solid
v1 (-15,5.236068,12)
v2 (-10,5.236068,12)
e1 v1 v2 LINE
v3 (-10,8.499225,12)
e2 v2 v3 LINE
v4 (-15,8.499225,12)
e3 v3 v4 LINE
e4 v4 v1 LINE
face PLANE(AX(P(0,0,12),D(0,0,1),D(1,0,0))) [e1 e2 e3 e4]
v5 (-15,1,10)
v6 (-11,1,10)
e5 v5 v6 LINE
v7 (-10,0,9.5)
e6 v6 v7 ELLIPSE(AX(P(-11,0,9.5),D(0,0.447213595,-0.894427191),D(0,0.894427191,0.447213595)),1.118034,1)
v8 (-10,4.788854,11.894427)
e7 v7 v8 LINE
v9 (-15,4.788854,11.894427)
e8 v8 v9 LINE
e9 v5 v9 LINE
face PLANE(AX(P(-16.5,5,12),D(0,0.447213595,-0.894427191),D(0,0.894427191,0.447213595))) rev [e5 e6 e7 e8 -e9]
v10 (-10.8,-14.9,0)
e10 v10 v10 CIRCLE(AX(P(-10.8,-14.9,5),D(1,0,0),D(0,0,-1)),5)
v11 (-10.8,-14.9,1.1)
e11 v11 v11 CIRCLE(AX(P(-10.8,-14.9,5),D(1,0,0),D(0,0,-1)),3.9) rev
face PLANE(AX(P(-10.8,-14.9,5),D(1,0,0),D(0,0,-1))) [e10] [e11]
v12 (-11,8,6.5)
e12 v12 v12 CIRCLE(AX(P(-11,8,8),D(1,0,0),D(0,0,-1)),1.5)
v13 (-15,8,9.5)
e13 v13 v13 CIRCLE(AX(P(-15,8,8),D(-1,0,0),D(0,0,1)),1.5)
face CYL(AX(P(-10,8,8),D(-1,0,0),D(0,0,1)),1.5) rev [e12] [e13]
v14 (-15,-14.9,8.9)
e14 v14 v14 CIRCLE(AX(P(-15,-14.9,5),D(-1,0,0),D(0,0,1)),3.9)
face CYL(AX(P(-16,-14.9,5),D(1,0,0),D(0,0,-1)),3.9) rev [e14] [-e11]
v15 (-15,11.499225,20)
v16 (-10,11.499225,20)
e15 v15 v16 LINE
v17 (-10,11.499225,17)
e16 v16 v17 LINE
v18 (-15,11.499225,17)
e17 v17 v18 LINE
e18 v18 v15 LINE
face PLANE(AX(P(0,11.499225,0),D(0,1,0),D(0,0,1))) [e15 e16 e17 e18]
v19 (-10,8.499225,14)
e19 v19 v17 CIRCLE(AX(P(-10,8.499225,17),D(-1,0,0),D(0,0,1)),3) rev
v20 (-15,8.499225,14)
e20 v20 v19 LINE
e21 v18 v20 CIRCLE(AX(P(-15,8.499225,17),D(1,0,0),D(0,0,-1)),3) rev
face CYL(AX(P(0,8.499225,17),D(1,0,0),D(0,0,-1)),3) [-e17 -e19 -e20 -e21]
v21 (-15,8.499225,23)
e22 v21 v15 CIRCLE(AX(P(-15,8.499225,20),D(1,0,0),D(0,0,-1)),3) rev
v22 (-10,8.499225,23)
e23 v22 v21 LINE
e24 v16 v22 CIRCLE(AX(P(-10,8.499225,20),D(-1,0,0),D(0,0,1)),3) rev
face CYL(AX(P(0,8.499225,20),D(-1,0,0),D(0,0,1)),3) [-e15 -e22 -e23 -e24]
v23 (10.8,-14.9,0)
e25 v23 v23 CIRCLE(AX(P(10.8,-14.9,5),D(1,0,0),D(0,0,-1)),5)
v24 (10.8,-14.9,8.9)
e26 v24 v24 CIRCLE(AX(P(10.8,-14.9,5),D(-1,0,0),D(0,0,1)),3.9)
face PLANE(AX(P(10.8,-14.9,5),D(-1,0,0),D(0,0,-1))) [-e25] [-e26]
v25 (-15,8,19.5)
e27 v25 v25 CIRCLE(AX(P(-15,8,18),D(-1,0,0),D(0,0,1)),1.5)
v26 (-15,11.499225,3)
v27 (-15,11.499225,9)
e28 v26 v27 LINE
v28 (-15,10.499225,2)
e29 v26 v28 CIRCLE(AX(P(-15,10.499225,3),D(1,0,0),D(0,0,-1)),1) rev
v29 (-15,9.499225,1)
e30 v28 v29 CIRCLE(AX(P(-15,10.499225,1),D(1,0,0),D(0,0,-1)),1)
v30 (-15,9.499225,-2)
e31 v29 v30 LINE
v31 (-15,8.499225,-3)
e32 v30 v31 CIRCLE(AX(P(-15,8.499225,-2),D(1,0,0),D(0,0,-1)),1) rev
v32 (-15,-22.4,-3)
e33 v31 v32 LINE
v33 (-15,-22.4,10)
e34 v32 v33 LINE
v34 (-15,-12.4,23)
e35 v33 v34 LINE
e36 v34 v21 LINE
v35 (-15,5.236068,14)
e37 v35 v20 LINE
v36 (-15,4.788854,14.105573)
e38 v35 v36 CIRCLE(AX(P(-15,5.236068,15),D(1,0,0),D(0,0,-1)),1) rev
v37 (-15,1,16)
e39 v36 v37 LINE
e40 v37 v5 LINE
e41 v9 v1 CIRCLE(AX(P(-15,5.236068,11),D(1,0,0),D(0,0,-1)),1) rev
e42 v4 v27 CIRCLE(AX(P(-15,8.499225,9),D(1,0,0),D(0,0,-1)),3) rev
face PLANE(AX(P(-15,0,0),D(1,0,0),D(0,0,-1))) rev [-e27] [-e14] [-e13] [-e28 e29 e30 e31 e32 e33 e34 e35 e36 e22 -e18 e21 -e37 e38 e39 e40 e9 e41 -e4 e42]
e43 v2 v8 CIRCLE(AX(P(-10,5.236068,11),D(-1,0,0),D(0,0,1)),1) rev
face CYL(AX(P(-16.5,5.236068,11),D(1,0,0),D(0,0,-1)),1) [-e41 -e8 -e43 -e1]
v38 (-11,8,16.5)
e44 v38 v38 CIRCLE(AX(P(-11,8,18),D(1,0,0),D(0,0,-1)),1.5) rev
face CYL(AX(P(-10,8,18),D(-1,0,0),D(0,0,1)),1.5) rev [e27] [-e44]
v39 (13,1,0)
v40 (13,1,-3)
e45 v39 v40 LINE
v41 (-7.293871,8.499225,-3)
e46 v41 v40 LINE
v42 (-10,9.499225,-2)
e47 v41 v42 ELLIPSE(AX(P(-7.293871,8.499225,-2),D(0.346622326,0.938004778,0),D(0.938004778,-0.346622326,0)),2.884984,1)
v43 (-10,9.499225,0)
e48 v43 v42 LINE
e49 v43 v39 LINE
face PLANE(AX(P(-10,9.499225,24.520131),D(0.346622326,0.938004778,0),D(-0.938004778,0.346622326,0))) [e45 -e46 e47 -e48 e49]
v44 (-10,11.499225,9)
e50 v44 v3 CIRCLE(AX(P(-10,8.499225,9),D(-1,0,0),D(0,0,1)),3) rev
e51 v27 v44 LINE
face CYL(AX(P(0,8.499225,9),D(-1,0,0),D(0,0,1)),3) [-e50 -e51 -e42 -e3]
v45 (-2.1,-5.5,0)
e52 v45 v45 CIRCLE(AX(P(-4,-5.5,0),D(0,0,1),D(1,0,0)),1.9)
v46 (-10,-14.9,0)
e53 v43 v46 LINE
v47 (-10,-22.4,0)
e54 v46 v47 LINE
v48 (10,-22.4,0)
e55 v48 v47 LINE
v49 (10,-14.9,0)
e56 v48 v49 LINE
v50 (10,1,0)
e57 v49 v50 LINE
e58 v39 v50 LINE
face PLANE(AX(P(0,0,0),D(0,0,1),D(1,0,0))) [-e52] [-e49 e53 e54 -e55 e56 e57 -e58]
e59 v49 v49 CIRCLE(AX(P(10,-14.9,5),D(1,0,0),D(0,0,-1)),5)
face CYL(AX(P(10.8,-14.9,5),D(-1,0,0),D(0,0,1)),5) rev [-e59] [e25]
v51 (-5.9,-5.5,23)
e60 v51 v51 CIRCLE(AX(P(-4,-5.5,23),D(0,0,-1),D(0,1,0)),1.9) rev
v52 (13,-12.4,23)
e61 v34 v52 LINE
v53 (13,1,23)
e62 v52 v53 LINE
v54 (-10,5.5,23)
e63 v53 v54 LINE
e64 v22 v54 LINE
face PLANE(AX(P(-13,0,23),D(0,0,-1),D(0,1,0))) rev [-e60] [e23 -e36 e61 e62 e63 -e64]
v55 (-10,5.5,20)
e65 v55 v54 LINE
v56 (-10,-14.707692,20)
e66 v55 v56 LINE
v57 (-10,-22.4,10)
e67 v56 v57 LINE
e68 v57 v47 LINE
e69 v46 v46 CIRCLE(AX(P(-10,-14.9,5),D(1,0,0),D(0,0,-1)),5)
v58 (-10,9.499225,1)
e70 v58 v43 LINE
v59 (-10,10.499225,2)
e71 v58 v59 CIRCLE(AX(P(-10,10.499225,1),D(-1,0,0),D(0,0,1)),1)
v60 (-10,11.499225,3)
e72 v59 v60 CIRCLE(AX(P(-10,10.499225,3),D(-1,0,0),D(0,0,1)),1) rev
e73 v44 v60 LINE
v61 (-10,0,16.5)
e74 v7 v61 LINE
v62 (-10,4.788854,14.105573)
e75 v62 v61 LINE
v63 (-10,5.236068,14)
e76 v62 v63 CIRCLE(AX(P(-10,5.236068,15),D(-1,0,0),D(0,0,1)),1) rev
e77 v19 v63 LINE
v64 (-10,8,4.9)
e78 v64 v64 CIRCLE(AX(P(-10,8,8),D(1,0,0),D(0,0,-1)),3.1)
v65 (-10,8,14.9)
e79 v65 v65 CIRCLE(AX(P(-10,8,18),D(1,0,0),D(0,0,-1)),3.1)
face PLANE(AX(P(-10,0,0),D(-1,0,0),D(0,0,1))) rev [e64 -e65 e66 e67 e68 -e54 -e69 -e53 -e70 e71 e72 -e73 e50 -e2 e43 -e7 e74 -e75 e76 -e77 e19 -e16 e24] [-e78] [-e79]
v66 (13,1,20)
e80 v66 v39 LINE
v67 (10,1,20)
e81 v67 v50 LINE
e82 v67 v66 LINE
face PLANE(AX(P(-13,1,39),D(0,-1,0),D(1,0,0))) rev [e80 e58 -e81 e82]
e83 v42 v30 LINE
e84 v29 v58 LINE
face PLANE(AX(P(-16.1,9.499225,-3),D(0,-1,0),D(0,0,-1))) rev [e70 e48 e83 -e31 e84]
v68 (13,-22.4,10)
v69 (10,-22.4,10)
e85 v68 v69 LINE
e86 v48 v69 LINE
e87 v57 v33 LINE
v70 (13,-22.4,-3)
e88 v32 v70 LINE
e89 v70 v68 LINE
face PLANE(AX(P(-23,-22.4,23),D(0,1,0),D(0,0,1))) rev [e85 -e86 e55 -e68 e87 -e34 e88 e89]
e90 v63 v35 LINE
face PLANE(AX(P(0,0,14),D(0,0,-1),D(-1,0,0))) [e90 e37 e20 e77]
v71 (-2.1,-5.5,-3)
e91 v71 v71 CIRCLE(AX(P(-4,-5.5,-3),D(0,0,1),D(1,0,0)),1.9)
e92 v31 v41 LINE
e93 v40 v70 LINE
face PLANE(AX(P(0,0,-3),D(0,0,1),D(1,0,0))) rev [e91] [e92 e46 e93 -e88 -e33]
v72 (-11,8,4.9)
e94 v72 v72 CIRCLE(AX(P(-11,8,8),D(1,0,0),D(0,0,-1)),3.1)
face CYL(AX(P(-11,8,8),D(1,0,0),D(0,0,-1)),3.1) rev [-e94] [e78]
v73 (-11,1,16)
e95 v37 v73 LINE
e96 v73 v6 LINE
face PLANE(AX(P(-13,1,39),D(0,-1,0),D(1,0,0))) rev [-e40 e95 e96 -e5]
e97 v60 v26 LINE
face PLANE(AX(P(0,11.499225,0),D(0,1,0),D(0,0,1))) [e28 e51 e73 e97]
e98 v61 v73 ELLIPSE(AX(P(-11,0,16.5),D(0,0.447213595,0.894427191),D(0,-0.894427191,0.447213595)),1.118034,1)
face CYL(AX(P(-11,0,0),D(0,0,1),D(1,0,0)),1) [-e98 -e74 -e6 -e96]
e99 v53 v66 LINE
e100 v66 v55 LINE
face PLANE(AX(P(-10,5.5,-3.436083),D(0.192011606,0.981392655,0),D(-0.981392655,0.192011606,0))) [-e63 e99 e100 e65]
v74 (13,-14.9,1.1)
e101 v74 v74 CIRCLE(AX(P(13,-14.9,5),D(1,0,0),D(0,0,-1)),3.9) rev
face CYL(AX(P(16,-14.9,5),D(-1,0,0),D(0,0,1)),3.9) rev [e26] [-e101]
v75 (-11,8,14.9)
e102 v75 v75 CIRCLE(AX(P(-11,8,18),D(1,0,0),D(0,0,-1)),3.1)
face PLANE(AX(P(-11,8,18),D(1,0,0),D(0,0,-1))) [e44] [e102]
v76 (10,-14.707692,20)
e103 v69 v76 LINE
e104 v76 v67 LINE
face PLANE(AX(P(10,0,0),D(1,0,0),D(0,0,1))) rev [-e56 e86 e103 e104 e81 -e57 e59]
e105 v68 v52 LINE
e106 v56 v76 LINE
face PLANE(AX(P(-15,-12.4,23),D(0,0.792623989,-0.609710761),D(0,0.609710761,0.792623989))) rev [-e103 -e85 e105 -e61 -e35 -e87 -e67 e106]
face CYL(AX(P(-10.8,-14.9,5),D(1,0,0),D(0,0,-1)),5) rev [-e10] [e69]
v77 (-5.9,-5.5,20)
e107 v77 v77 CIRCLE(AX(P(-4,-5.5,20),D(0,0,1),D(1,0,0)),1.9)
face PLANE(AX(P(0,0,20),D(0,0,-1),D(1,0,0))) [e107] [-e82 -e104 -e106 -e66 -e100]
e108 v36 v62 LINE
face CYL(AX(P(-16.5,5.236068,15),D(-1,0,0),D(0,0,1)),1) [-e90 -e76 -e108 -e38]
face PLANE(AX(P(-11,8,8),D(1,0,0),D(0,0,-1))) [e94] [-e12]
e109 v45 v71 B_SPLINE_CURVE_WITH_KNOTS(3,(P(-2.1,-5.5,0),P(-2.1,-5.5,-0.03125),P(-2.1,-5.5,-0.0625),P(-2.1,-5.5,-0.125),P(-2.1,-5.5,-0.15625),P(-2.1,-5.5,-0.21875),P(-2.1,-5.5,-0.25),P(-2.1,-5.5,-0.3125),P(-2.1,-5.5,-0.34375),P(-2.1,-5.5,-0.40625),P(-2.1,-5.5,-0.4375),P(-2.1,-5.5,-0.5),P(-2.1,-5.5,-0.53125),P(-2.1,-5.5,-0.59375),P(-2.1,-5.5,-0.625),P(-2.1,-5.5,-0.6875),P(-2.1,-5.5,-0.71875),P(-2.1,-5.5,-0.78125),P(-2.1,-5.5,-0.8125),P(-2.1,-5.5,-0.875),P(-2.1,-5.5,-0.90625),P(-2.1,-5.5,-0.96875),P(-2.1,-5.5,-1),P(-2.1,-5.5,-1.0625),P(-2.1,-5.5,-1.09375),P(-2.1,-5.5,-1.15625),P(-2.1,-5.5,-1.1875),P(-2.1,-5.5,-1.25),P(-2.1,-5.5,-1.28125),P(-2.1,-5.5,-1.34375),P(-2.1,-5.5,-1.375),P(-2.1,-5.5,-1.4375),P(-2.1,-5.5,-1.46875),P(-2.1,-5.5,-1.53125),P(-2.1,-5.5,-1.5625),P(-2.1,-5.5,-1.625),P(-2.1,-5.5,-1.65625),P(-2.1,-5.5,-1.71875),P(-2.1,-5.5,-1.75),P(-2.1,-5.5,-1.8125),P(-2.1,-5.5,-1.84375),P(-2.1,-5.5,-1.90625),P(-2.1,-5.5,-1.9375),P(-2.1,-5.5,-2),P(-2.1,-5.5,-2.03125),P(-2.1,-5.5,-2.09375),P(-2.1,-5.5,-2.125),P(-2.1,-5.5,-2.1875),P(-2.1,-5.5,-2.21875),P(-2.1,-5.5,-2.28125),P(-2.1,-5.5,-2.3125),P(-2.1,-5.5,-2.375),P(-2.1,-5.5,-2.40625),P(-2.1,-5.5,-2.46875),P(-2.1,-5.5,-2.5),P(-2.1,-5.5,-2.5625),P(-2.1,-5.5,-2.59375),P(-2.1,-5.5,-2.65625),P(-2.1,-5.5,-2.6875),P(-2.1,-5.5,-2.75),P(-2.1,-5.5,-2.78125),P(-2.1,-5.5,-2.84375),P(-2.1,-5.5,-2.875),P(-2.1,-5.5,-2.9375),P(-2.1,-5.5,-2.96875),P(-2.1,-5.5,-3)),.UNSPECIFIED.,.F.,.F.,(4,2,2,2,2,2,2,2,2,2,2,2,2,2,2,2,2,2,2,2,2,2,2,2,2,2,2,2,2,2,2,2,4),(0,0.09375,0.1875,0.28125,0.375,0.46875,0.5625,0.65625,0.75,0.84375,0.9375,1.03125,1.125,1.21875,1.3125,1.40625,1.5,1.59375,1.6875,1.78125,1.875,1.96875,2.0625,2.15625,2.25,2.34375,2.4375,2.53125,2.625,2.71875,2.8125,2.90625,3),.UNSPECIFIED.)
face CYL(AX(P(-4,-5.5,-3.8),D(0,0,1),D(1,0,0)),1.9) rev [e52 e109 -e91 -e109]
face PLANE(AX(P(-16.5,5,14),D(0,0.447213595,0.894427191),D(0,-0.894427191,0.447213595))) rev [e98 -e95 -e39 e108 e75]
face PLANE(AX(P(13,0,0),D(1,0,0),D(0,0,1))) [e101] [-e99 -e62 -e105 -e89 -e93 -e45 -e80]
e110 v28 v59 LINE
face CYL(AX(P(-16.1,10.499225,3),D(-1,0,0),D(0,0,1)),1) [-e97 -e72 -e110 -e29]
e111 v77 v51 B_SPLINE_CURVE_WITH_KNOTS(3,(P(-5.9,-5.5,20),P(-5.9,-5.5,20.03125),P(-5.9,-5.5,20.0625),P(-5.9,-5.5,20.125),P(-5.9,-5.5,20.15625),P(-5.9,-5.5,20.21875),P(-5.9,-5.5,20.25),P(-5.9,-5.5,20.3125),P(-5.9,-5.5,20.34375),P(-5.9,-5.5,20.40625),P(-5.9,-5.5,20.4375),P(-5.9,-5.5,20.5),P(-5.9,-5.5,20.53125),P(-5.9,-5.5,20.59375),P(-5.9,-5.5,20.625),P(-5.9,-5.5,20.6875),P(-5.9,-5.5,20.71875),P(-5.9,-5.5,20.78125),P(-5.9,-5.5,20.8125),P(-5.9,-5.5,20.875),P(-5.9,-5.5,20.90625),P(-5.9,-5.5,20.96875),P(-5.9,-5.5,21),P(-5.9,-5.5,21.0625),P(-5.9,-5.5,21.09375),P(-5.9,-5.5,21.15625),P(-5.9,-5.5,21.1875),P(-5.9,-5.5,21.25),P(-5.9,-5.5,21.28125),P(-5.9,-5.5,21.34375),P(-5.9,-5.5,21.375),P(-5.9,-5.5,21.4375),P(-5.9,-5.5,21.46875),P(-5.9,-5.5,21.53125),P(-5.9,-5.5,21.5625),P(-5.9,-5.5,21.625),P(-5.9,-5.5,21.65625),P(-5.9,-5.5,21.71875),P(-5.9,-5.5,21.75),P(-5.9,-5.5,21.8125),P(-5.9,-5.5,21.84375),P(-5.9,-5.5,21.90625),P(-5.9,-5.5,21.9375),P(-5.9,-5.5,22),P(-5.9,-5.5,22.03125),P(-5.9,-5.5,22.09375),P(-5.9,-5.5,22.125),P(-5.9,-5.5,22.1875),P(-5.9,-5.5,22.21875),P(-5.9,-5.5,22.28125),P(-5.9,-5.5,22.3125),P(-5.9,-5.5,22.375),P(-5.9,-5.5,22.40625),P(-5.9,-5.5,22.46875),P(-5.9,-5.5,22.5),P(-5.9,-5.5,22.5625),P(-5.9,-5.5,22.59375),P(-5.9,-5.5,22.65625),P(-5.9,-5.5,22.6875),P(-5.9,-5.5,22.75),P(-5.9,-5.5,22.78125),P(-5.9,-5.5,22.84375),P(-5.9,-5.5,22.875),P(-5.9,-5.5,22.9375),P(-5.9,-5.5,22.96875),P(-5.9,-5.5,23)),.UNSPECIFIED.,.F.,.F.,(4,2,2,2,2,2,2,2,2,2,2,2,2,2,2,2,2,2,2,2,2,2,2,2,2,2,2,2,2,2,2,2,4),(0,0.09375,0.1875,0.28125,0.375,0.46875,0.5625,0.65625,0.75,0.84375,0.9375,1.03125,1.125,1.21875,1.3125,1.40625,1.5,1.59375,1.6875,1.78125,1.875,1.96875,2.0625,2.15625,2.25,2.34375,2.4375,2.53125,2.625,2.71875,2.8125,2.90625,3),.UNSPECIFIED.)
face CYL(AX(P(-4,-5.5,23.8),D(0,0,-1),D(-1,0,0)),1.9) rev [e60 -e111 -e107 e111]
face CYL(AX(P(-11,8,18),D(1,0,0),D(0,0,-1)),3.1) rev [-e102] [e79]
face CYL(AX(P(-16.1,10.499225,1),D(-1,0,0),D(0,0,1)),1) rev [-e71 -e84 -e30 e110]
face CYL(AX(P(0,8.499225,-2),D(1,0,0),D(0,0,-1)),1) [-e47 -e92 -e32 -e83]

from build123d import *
from build123d.topology import SkipClean

# Parameters (mm, degrees)
SKETCH_1_W           = 20
SKETCH_1_H           = 57.76596942167697
EXTRUDE_1_DEPTH      = 3
EXTRUDE_2_DEPTH      = 3
CUT_EXTRUDE_1_DEPTH  = 6
SKETCH_8_R           = 4.48
CUT_EXTRUDE_2_DEPTH  = 0.8
SKETCH_9_R           = 1.9
CUT_EXTRUDE_3_DEPTH  = 3.8
SKETCH_12_W          = 26.000000000000007
SKETCH_12_H          = 35.36596942167698
CUT_EXTRUDE_4_DEPTH  = 36.00000000000001
CUT_EXTRUDE_8_DEPTH  = 28.00000000000001
SKETCH_23_W          = 26.000000000000004
SKETCH_23_H          = 26
SKETCH_23_W_2        = 20
SKETCH_23_H_2        = 19.999999999999993
EXTRUDE_7_DEPTH      = 4
SKETCH_24_W          = 20
SKETCH_24_H          = 19.999999999999993
EXTRUDE_8_DEPTH      = 3
SKETCH_25_W          = 5.000000000000002
SKETCH_25_H          = 16
SKETCH_25_R          = 1.4999999999999991
EXTRUDE_9_DEPTH      = 3
FILLET_1_R           = 1
CUT_EXTRUDE_9_DEPTH  = 3
SKETCH_27_R          = 1.4999999999999987
CUT_EXTRUDE_10_DEPTH = 3
SKETCH_28_W          = 20
SKETCH_28_H          = 19.999999999999993
CUT_EXTRUDE_11_DEPTH = 10
CUT_EXTRUDE_12_DEPTH = 42.00000000000001
SKETCH_31_R          = 4.48
SKETCH_31_R_2        = 3.98
EXTRUDE_13_DEPTH     = 0.8
SKETCH_32_R          = 5.000000000000001
SKETCH_32_R_2        = 3.98
CUT_EXTRUDE_13_DEPTH = 0.8
SKETCH_33_R          = 4.48
EXTRUDE_14_DEPTH     = 3
SKETCH_36_R          = 5.000000000000001
CUT_EXTRUDE_14_DEPTH = 3
SKETCH_37_R          = 3.98
SKETCH_37_R_2        = 3.900000000000001
EXTRUDE_17_DEPTH     = 0.8
SKETCH_38_R          = 1.5000000000000009
EXTRUDE_18_DEPTH     = 3
SKETCH_39_W          = 4.187599959799879
SKETCH_39_H          = 1.3608825238343043
EXTRUDE_19_DEPTH     = 3
EXTRUDE_START        = 2
SKETCH_43_R          = 1.5000000000000024
SKETCH_43_R_2        = 1.5000000000000009
SKETCH_43_R_3        = 3.900000000000002
EXTRUDE_22_DEPTH     = 2
SKETCH_44_W          = 5
SKETCH_44_H          = 9.399224841629362
EXTRUDE_23_DEPTH     = 2
EXTRUDE_24_DEPTH     = 3
SKETCH_47_W          = 5
SKETCH_47_H          = 9.399224841629362
EXTRUDE_25_DEPTH     = 8
SKETCH_51_W          = 5
SKETCH_51_H          = 14
SKETCH_51_H_2        = 7.999999999999998
EXTRUDE_28_DEPTH     = 1.1
CUT_EXTRUDE_16_DEPTH = 6.1000000000000005
FILLET_START         = -16
FILLET_9_DEPTH       = 7
FILLET_START_2       = -15
FILLET_9_2_DEPTH     = 5
EXTRUDE_30_DEPTH     = 3
FILLET_10_R          = 1
SKETCH_57_W          = 5
SKETCH_57_H          = 10.499224841629362
EXTRUDE_31_DEPTH     = 1
SKETCH_58_W          = 5
SKETCH_58_H          = 10.499224841629362
EXTRUDE_32_DEPTH     = 1
FILLET_11_R          = 3
CUT_EXTRUDE_19_DEPTH = 6.500000000000001
FILLET_14_R          = 1
FILLET_19_R          = 1
SKETCH_62_R          = 3.1000000000000005
CUT_EXTRUDE_20_DEPTH = 1


with BuildPart() as part:
    # 草图1 → 凸台-拉伸1 (new body)
    with BuildSketch(Plane.XY):
        with Locations((0, -28.882984710838485)):
            Rectangle(SKETCH_1_W, SKETCH_1_H)
    extrude_1 = extrude(amount=-EXTRUDE_1_DEPTH)

    # 草图2 → 凸台-拉伸2 (add)
    with BuildSketch(Plane.ZY.offset(10)):
        Polygon((-3, -1.22e-15), (23, 0), (23.000000000000007, -57.76596942167697), (-3, -57.76596942167697), align=None)
    extrude_2 = extrude(amount=EXTRUDE_2_DEPTH)

    # 草图7 → 切除-拉伸1 (cut)
    with BuildSketch(Plane(origin=(-10, 0, 0), x_dir=(0, 0, -1), z_dir=(1, 0, 0))):
        with BuildLine():
            ThreePointArc((-1.0999999999999996, -14.899999999999997), (-5, -10.999999999999996), (-8.9, -14.899999999999997))
            Line((-8.9, -14.899999999999997), (-1.1000000000000014, -14.899999999999997))
        make_face()
        with BuildLine():
            Line((-1.1000000000000014, -14.899999999999997), (-8.9, -14.899999999999997))
            ThreePointArc((-8.9, -14.899999999999997), (-5.000000000000001, -18.799999999999997), (-1.0999999999999996, -14.899999999999999))
        make_face()
    cut_extrude_1 = extrude(amount=-CUT_EXTRUDE_1_DEPTH, mode=Mode.SUBTRACT)

    # 草图8 → 切除-拉伸2 (cut)
    with BuildSketch(Plane.ZY.offset(13.000000000000002)):
        with Locations((5, -14.899999999999997)):
            Circle(SKETCH_8_R)
    cut_extrude_2 = extrude(amount=-CUT_EXTRUDE_2_DEPTH, mode=Mode.SUBTRACT)

    # 草图9 → 切除-拉伸3 (cut)
    with BuildSketch(Plane.XY):
        with Locations((-4, -5.499999999999998)):
            Circle(SKETCH_9_R)
    cut_extrude_3 = extrude(amount=-CUT_EXTRUDE_3_DEPTH, mode=Mode.SUBTRACT)

    # 镜向1: 凸台-拉伸2 across plane
    add(extrude_2.mirror(Plane(origin=(0, 0, 0), x_dir=(0, 0, 1), z_dir=(1, 0, 0))))

    # 镜向2: 切除-拉伸1, 切除-拉伸2 across plane
    add(cut_extrude_1.mirror(Plane(origin=(0, 0, 0), x_dir=(0, 0, 1), z_dir=(1, 0, 0))), mode=Mode.SUBTRACT)
    add(cut_extrude_2.mirror(Plane(origin=(0, 0, 0), x_dir=(0, 0, 1), z_dir=(1, 0, 0))), mode=Mode.SUBTRACT)

    # 镜向3: 凸台-拉伸1 across plane
    add(extrude_1.mirror(Plane.XY.offset(10)))

    # 镜向5: 切除-拉伸3 across plane
    add(cut_extrude_3.mirror(Plane.XY.offset(10)), mode=Mode.SUBTRACT)

    # 草图12 → 切除-拉伸4 (cut)
    with BuildSketch(Plane(origin=(13.000000000000002, 0, 0), x_dir=(0, 0, -1), z_dir=(1, 0, 0))):
        with Locations((-10.000000000000004, -40.08298471083848)):
            Rectangle(SKETCH_12_W, SKETCH_12_H)
    extrude(amount=-CUT_EXTRUDE_4_DEPTH, mode=Mode.SUBTRACT)

    # 草图22 → 切除-拉伸8 (cut)
    with BuildSketch(Plane(origin=(13.000000000000002, 0, 0), x_dir=(0, 0, -1), z_dir=(1, 0, 0))):
        Polygon((-23.000000000000007, -12.399999999999997), (-23.000000000000007, -22.399999999999995), (-10.000000000000007, -22.399999999999995), align=None)
    extrude(amount=-CUT_EXTRUDE_8_DEPTH, mode=Mode.SUBTRACT)

    # 草图23 → 凸台-拉伸7 (add)
    with BuildSketch(Plane(origin=(0, 0, 0), x_dir=(1, 0, 0), z_dir=(0, 1, 0))):
        with Locations((0, -10)):
            Rectangle(SKETCH_23_W, SKETCH_23_H)
        with Locations((0, -9.999999999999996)):
            Rectangle(SKETCH_23_W_2, SKETCH_23_H_2, mode=Mode.SUBTRACT)
    extrude(amount=EXTRUDE_7_DEPTH)

    # 草图24 → 凸台-拉伸8 (add)
    with BuildSketch(Plane(origin=(0, 4, 0), x_dir=(1, 0, 0), z_dir=(0, 1, 0))):
        with Locations((0, -9.999999999999996)):
            Rectangle(SKETCH_24_W, SKETCH_24_H)
    extrude(amount=-EXTRUDE_8_DEPTH)

    # 草图25 → 凸台-拉伸9 (add)
    with BuildSketch(Plane(origin=(0, 4, 0), x_dir=(1, 0, 0), z_dir=(0, 1, 0))):
        with Locations((15.500000000000004, -15)):
            Rectangle(SKETCH_25_W, SKETCH_25_H)
        with Locations(Location((15.500000000000002, -20.23329325648959, 0), (0, 0, 270))):
            Circle(SKETCH_25_R, mode=Mode.SUBTRACT)
        with Locations(Location((15.500000000000002, -10.23329325648959, 0), (0, 0, 270))):
            Circle(SKETCH_25_R, mode=Mode.SUBTRACT)
    extrude(amount=-EXTRUDE_9_DEPTH)

    # 圆角1
    fillet_1_edges = [part.edges().sort_by_distance(p)[0] for p in [
        (18.000000000000004, 1, 15),
    ]]
    fillet(fillet_1_edges, radius=FILLET_1_R)

    # 草图26 → 切除-拉伸9 (cut)
    with BuildSketch(Plane(origin=(13.000000000000002, 0, 0), x_dir=(0, 0, -1), z_dir=(1, 0, 0))):
        with BuildLine():
            Line((-16, 1.0000000000000004), (-13.999999999999998, 1.0000000000000004))
            ThreePointArc((-13.999999999999998, 1.0000000000000004), (-15, 0), (-16, 1.0000000000000004))
        make_face()
    extrude(amount=-CUT_EXTRUDE_9_DEPTH, mode=Mode.SUBTRACT)

    # 草图27 → 切除-拉伸10 (cut)
    with BuildSketch(Plane(origin=(0, 4, 0), x_dir=(1, 0, 0), z_dir=(0, 1, 0))):
        with Locations(Location((7.500000000000002, -15.233293256489592, 0), (0, 0, 270))):
            Circle(SKETCH_27_R)
    extrude(amount=-CUT_EXTRUDE_10_DEPTH, mode=Mode.SUBTRACT)

    # 草图28 → 切除-拉伸11 (cut)
    with BuildSketch(Plane.XZ.offset(-1)):
        with Locations((0, 9.999999999999996)):
            Rectangle(SKETCH_28_W, SKETCH_28_H)
    extrude(amount=-CUT_EXTRUDE_11_DEPTH, mode=Mode.SUBTRACT)

    # 草图29 → 切除-拉伸12 (cut)
    with BuildSketch(Plane(origin=(0, 0, -3), x_dir=(-1, 0, 0), z_dir=(0, 0, -1))):
        Polygon((13.000000000000002, 4), (-24.68163228941081, 4), (-24.68163228941081, 0.9999999999999957), (13.000000000000002, 1.0000000000000002), align=None)
    extrude(amount=-CUT_EXTRUDE_12_DEPTH, mode=Mode.SUBTRACT)

    # 草图31 → 凸台-拉伸13 (add)
    with BuildSketch(Plane.ZY.offset(12.200000000000001)):
        with Locations((5, -14.899999999999997)):
            Circle(SKETCH_31_R)
        with Locations((5, -14.899999999999997)):
            Circle(SKETCH_31_R_2, mode=Mode.SUBTRACT)
    extrude(amount=EXTRUDE_13_DEPTH)

    # 草图32 → 切除-拉伸13 (cut)
    with BuildSketch(Plane(origin=(-10, 0, 0), x_dir=(0, 0, -1), z_dir=(1, 0, 0))):
        with Locations((-5, -14.899999999999997)):
            Circle(SKETCH_32_R)
        with Locations(Location((-5, -14.899999999999997, 0), (0, 0, 180))):
            Circle(SKETCH_32_R_2, mode=Mode.SUBTRACT)
    cut_extrude_13 = extrude(amount=-CUT_EXTRUDE_13_DEPTH, mode=Mode.SUBTRACT)

    # 草图33 → 凸台-拉伸14 (add)
    with BuildSketch(Plane(origin=(13.000000000000002, 0, 0), x_dir=(0, 0, -1), z_dir=(1, 0, 0))):
        with Locations((-5, -14.899999999999997)):
            Circle(SKETCH_33_R)
    extrude(amount=-EXTRUDE_14_DEPTH)

    # 镜向6: 切除-拉伸1, 切除-拉伸13 across plane
    add(cut_extrude_1.mirror(Plane(origin=(0, 0, 0), x_dir=(0, 0, 1), z_dir=(1, 0, 0))), mode=Mode.SUBTRACT)
    add(cut_extrude_13.mirror(Plane(origin=(0, 0, 0), x_dir=(0, 0, 1), z_dir=(1, 0, 0))), mode=Mode.SUBTRACT)

    # 草图36 → 切除-拉伸14 (cut)
    with BuildSketch(Plane(origin=(-10.8, 0, 0), x_dir=(0, 0, -1), z_dir=(1, 0, 0))):
        with Locations((-5, -14.899999999999997)):
            Circle(SKETCH_36_R)
    cut_extrude_14 = extrude(amount=CUT_EXTRUDE_14_DEPTH, mode=Mode.SUBTRACT)

    # 镜向7: 切除-拉伸14 across plane
    add(cut_extrude_14.mirror(Plane(origin=(0, 0, 0), x_dir=(0, 0, 1), z_dir=(1, 0, 0))), mode=Mode.SUBTRACT)

    # 草图37 → 凸台-拉伸17 (add)
    with SkipClean():  # the faces are left unmerged after this step: merging them gives an invalid solid
        with BuildSketch(Plane.ZY.offset(12.200000000000001)):
            with Locations((5, -14.899999999999997)):
                Circle(SKETCH_37_R)
            with Locations((5, -14.899999999999997)):
                Circle(SKETCH_37_R_2, mode=Mode.SUBTRACT)
        extrude(amount=EXTRUDE_17_DEPTH)

    # 草图38 → 凸台-拉伸18 (add)
    # profile 1 of 2: a face of its own
    with SkipClean():  # the faces are left unmerged after this step: merging them gives an invalid solid
        with BuildSketch(Plane.ZY.offset(13.000000000000002)):
            Polygon((15, 10.399224841629362), (15, 1), (20.999999999999996, 1.0000000000000002), (20.999999999999996, 10.399224841629362), align=None)
            with Locations((18, 8)):
                Circle(SKETCH_38_R, mode=Mode.SUBTRACT)
        # profile 2 of 2: a face of its own
        with BuildSketch(Plane.ZY.offset(13.000000000000002)):
            Polygon((11, 1), (11, 10.399224841629362), (5.000000000000001, 10.399224841629362), (5.000000000000001, 1.0000000000000002), align=None)
            with Locations((8, 8)):
                Circle(SKETCH_38_R, mode=Mode.SUBTRACT)
        extrude(amount=-EXTRUDE_18_DEPTH)

    # 草图39 → 凸台-拉伸19 (add)
    with SkipClean():  # the faces are left unmerged after this step: merging them gives an invalid solid
        with BuildSketch(Plane(origin=(13.000000000000002, 0, 0), x_dir=(0, 0, -1), z_dir=(1, 0, 0))):
            with Locations((-15.28799119011226, 0.3195587380828476)):
                Rectangle(SKETCH_39_W, SKETCH_39_H)
        extrude(amount=-EXTRUDE_19_DEPTH)

    # 草图43 → 凸台-拉伸22 (add)
    with BuildSketch(Plane.ZY.offset(13.000000000000002).offset(EXTRUDE_START)):
        Polygon((-3, 1.0000000000000002), (5.000000000000004, 1.0000000000000002), (5.000000000000001, 10.399224841629362), (11, 10.399224841629362), (11, 1.0000000000000002), (15, 1.0000000000000002), (15, 10.399224841629362), (20.999999999999996, 10.399224841629362), (20.999999999999996, 1.0000000000000002), (23.000000000000007, 1.0000000000000002), (23.000000000000007, -12.399999999999997), (10.000000000000009, -22.399999999999995), (-3, -22.399999999999995), align=None)
        with Locations((8, 8)):
            Circle(SKETCH_43_R, mode=Mode.SUBTRACT)
        with Locations((18, 8)):
            Circle(SKETCH_43_R_2, mode=Mode.SUBTRACT)
        with Locations((5, -14.899999999999997)):
            Circle(SKETCH_43_R_3, mode=Mode.SUBTRACT)
    extrude(amount=-EXTRUDE_22_DEPTH)

    # 草图44 → 凸台-拉伸23 (add)
    with BuildSketch(Plane.XY.offset(20.999999999999996)):
        with Locations((-12.500000000000002, 5.699612420814681)):
            Rectangle(SKETCH_44_W, SKETCH_44_H)
    extrude(amount=EXTRUDE_23_DEPTH)

    # 草图45 → 凸台-拉伸24 (add)
    with BuildSketch(Plane.XY.offset(23)):
        Polygon((-10.000000000000002, 0.9999999999999981), (13.000000000000002, 0.9999999999999943), (-10.000000000000002, 5.499999999999998), align=None)
    extrude(amount=-EXTRUDE_24_DEPTH)

    # 草图47 → 凸台-拉伸25 (add)
    with BuildSketch(Plane(origin=(0, 0, 5.000000000000001), x_dir=(-1, 0, 0), z_dir=(0, 0, -1))):
        with Locations((12.500000000000002, 5.699612420814681)):
            Rectangle(SKETCH_47_W, SKETCH_47_H)
    extrude(amount=EXTRUDE_25_DEPTH)

    # 草图51 → 凸台-拉伸28 (add)
    with BuildSketch(Plane(origin=(0, 10.399224841629362, 0), x_dir=(1, 0, 0), z_dir=(0, 1, 0))):
        with Locations((-12.500000000000002, -4)):
            Rectangle(SKETCH_51_W, SKETCH_51_H)
        with Locations((-12.500000000000002, -19)):
            Rectangle(SKETCH_51_W, SKETCH_51_H_2)
    extrude(amount=EXTRUDE_28_DEPTH)

    # 草图53 → 切除-拉伸16 (cut)
    with BuildSketch(Plane(origin=(-10, 0, 0), x_dir=(0, 0, -1), z_dir=(1, 0, 0))):
        Polygon((2.999999999999999, 11.499224841629362), (-2.000000000000001, 11.499224841629362), (-2.0000000000000004, 9.49922484162936), (2.999999999999999, 9.499224841629362), align=None)
    extrude(amount=-CUT_EXTRUDE_16_DEPTH, mode=Mode.SUBTRACT)

    # 圆角9: read off the stored shape, not the designer's step
    # 圆角9 outline → 圆角9 (cut)
    with BuildSketch(Plane.YZ.offset(FILLET_START)):
        with BuildLine():
            Line((11.499224842, 2), (11.499224842, 3))
            ThreePointArc((11.499224842, 3), (11.206331623, 2.292893219), (10.499224842, 2))
            Line((10.499224842, 2), (11.499224842, 2))
        make_face()
    extrude(amount=FILLET_9_DEPTH, mode=Mode.SUBTRACT)

    # Fillet 9 2 outline → Fillet 9 2 (add)
    with BuildSketch(Plane.YZ.offset(FILLET_START_2)):
        with BuildLine():
            ThreePointArc((9.499224842, 1), (9.79211806, 1.707106782), (10.499224842, 2))
            Line((10.499224842, 2), (9.499224842, 2))
            Line((9.499224842, 2), (9.499224842, 1))
        make_face()
    extrude(amount=FILLET_9_2_DEPTH)

    # 草图54 → 凸台-拉伸30 (add)
    with BuildSketch(Plane(origin=(0, 0, -3), x_dir=(-1, 0, 0), z_dir=(0, 0, -1))):
        Polygon((-13.000000000000002, 0.9999999999999972), (10.000000000000002, 1.0000000000000002), (10, 9.499224841629362), align=None)
    extrude(amount=-EXTRUDE_30_DEPTH)

    # 圆角10
    fillet_10_edges = [part.edges().sort_by_distance(p)[0] for p in [
        (-12.5, 9.499224841629362, -2.999999999999999),
    ]]
    fillet(fillet_10_edges, radius=FILLET_10_R)

    # 草图57 → 凸台-拉伸31 (add)
    with BuildSketch(Plane(origin=(0, 0, 15), x_dir=(-1, 0, 0), z_dir=(0, 0, -1))):
        with Locations((12.500000000000002, 6.249612420814681)):
            Rectangle(SKETCH_57_W, SKETCH_57_H)
    extrude(amount=EXTRUDE_31_DEPTH)

    # 草图58 → 凸台-拉伸32 (add)
    with BuildSketch(Plane.XY.offset(11)):
        with Locations((-12.500000000000002, 6.249612420814681)):
            Rectangle(SKETCH_58_W, SKETCH_58_H)
    extrude(amount=EXTRUDE_32_DEPTH)

    # 圆角11
    # the kernel refuses this fillet: 3 mm, written as the material it takes off along each edge
    with BuildSketch(Plane(origin=(-2.5000000000000018, 11.499224841629362, 23), x_dir=(0, -1, 0), z_dir=(-1, 0, 0)), Plane(origin=(-2.5000000000000018, 11.499224841629362, 14), x_dir=(0, 0, 1), z_dir=(-1, 0, 0))) as fillet_11_piece_1:
        with BuildLine():
            CenterArc((FILLET_11_R, -FILLET_11_R), FILLET_11_R, 90, 90)
            Line((0, -FILLET_11_R), (0, 0))
            Line((0, 0), (FILLET_11_R, 0))
        make_face()
    extrude(amount=20, mode=Mode.SUBTRACT)
    with BuildSketch(Plane(origin=(-22.5, 11.499224841629362, 12), x_dir=(0, -1, 0), z_dir=(1, 0, 0))) as fillet_11_piece_2:
        with BuildLine():
            CenterArc((FILLET_11_R, FILLET_11_R), FILLET_11_R, 180, 90)
            Line((0, FILLET_11_R), (0, 0))
            Line((0, 0), (FILLET_11_R, 0))
        make_face()
    extrude(amount=20, mode=Mode.SUBTRACT)

    # 草图61 → 切除-拉伸19 (cut)
    with BuildSketch(Plane(origin=(-10, 0, 0), x_dir=(0, 0, -1), z_dir=(1, 0, 0))):
        Polygon((-12, 1.0000000000000002), (-12, 5), (-10, 1.0000000000000007), align=None)
        Polygon((-13.999999999999998, 1.0000000000000002), (-13.999999999999998, 5), (-16, 0.9999999999999998), align=None)
    extrude(amount=-CUT_EXTRUDE_19_DEPTH, mode=Mode.SUBTRACT)

    # 圆角14
    fillet_14_edges = [part.edges().sort_by_distance(p)[0] for p in [
        (-10, 1.0000000000000002, 13),
    ]]
    fillet(fillet_14_edges, radius=FILLET_14_R)

    # 圆角19
    fillet_19_edges = [part.edges().sort_by_distance(p)[0] for p in [
        (-12.5, 5, 12),
        (-12.5, 5, 13.999999999999998),
    ]]
    fillet(fillet_19_edges, radius=FILLET_19_R)

    # 草图62 → 切除-拉伸20 (cut)
    with BuildSketch(Plane(origin=(-10, 0, 0), x_dir=(0, 0, -1), z_dir=(1, 0, 0))):
        with Locations((-18, 8)):
            Circle(SKETCH_62_R)
        with Locations((-8, 8)):
            Circle(SKETCH_62_R)
    extrude(amount=-CUT_EXTRUDE_20_DEPTH, mode=Mode.SUBTRACT)


solid = part.part
